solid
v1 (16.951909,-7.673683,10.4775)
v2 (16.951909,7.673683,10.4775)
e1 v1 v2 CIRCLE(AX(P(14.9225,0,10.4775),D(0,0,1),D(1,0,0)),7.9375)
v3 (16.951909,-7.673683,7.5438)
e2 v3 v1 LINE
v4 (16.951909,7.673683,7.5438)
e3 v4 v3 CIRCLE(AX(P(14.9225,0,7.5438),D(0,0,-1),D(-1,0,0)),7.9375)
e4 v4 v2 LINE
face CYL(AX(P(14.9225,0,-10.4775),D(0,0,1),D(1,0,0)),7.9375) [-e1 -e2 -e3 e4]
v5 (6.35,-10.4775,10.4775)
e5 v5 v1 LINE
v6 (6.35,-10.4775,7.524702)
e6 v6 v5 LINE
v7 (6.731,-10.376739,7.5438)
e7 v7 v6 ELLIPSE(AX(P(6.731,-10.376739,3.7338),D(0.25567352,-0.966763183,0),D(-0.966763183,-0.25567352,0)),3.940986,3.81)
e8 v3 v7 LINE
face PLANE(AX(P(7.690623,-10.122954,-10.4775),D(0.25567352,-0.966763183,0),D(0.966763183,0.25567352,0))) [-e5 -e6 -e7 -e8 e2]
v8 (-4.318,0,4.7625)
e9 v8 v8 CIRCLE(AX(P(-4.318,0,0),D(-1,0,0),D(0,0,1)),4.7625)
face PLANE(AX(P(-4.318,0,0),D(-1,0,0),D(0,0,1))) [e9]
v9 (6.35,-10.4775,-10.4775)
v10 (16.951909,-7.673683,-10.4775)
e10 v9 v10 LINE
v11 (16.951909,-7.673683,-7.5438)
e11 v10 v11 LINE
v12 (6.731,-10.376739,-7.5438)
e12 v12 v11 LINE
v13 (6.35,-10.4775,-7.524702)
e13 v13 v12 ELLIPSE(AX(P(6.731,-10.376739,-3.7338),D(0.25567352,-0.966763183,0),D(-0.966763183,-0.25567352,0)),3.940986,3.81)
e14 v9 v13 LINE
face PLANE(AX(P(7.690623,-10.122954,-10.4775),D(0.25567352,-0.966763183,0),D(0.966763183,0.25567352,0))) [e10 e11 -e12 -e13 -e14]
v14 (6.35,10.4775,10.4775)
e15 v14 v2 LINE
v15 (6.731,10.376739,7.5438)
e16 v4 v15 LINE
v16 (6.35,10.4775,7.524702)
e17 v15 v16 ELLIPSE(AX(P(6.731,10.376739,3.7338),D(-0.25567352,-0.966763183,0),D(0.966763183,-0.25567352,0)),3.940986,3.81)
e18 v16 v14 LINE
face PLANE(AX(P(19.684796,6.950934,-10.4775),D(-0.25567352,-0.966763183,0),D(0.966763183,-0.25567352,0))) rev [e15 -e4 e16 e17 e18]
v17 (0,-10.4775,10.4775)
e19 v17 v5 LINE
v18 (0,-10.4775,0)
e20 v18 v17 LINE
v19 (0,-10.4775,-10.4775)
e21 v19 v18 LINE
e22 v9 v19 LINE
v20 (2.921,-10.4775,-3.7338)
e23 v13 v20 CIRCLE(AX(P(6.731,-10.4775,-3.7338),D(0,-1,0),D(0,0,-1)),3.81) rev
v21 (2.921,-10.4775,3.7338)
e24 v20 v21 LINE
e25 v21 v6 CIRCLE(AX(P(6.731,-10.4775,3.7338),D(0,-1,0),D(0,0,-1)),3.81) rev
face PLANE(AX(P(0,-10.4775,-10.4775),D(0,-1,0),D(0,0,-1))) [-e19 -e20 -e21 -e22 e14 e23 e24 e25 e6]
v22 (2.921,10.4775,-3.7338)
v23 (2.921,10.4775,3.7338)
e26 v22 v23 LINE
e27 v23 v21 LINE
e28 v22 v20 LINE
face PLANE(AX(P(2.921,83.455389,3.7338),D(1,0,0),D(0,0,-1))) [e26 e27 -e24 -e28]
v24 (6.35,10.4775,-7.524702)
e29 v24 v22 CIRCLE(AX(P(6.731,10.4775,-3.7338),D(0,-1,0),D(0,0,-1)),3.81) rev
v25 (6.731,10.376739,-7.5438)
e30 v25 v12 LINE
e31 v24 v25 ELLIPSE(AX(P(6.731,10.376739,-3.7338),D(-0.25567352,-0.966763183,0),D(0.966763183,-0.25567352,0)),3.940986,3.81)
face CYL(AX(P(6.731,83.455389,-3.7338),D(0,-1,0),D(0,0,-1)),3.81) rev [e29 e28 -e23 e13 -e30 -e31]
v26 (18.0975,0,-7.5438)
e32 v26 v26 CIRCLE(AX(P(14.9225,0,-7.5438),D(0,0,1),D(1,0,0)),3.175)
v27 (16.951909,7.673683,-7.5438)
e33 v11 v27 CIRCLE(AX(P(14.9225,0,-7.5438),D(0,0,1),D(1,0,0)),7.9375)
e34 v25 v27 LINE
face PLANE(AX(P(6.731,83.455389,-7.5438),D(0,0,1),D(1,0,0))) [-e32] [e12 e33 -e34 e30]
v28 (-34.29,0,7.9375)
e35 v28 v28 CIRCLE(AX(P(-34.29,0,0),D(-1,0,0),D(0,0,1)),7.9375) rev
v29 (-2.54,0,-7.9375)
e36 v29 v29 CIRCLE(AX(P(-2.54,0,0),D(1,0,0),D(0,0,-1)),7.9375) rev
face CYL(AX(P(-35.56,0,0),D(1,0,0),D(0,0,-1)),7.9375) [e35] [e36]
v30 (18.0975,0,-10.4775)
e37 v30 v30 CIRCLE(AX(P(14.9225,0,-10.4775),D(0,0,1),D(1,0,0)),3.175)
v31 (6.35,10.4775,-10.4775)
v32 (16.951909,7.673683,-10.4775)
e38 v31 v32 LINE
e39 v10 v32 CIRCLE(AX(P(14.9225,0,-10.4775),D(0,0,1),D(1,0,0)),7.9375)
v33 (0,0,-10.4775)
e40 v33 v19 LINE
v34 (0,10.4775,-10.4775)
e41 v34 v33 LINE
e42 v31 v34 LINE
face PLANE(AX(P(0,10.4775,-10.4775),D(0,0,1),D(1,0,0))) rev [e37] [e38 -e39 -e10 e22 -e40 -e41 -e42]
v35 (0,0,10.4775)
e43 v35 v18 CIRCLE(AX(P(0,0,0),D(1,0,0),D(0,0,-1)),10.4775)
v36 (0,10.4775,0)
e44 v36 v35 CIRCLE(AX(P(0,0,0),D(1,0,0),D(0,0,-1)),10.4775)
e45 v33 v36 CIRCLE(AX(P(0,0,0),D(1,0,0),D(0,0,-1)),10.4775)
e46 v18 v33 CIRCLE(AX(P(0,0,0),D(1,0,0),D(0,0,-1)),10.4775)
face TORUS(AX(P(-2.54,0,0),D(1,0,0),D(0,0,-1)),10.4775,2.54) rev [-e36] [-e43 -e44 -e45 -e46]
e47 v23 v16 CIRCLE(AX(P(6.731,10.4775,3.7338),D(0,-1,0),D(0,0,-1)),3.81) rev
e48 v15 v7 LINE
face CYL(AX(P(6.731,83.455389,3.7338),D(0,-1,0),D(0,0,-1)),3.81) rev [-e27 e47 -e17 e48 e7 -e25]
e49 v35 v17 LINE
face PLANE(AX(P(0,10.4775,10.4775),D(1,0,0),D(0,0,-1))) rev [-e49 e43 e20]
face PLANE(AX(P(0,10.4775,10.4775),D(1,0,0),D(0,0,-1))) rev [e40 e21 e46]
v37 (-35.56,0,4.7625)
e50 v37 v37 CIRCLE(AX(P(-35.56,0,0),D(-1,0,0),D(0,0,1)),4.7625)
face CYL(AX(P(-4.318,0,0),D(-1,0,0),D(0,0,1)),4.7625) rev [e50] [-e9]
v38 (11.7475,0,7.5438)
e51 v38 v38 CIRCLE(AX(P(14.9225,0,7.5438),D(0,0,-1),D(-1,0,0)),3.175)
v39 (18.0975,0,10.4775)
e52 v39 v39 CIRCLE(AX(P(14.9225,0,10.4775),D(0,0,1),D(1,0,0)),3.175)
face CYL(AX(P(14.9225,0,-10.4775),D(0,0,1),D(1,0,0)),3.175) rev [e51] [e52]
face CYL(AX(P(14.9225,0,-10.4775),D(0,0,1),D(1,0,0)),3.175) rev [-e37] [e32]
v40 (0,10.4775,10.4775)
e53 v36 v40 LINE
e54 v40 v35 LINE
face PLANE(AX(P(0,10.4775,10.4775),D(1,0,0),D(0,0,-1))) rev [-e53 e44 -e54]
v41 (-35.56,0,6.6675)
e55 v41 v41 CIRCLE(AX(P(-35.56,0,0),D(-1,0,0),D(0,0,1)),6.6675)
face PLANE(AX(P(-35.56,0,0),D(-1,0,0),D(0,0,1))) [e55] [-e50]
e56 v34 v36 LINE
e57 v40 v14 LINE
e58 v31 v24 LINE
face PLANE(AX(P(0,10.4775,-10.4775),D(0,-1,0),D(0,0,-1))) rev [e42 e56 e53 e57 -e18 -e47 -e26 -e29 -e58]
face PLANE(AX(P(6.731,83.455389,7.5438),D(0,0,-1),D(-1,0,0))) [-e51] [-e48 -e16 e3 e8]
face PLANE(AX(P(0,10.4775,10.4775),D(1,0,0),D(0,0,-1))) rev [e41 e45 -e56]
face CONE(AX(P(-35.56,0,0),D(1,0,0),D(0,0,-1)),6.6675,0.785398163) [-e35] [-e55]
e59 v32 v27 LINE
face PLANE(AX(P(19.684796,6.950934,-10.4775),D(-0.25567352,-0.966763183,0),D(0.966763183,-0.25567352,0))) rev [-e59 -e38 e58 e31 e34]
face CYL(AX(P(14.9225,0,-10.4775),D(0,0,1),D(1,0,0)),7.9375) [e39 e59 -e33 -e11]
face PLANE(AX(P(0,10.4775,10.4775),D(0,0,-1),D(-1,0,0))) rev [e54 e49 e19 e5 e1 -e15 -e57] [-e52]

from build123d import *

# Parameters (mm, degrees)
SKETCH1_W               = 22.86
SKETCH1_H               = 20.955
BOSS_EXTRUDE1_DEPTH     = 10.4775
CUT_EXTRUDE1_DEPTH      = 33.733310729
CUT_EXTRUDE1_DEPTH_BACK = 33.733310729
CUT_EXTRUDE2_DEPTH      = 33.733310729
SKETCH4_R               = 7.9375
BOSS_EXTRUDE2_DEPTH     = 35.56
SKETCH5_R               = 4.7625
CUT_EXTRUDE3_DEPTH      = 31.242
FILLET1_R               = 2.54
CHAMFER1_SIZE           = 1.27


with BuildPart() as part:
    # Sketch1 → Boss-Extrude1 (new, symmetric)
    with BuildSketch(Plane(origin=(0, 0, 0), x_dir=(1, 0, 0), z_dir=(0, 1, 0))):
        with Locations((11.43, 0)):
            Rectangle(SKETCH1_W, SKETCH1_H)
    extrude(amount=BOSS_EXTRUDE1_DEPTH, both=True)

    # Sketch2 → Cut-Extrude1 (cut, two sides: drawn at the far end of the back side and taken through both)
    with BuildSketch(Plane(origin=(0, 10.4775, 0), x_dir=(1, 0, 0), z_dir=(0, 1, 0)).offset(-CUT_EXTRUDE1_DEPTH_BACK)):
        with BuildLine():
            Line((2.921, 3.7338), (2.921, -3.7338))
            ThreePointArc((2.921, -3.7338), (4.036923164, -6.427876836), (6.731, -7.5438))
            Line((6.731, -7.5438), (22.86, -7.5438))
            Line((22.86, -7.5438), (22.86, 7.5438))
            Line((22.86, 7.5438), (6.731, 7.5438))
            ThreePointArc((6.731, 7.5438), (4.036923164, 6.427876836), (2.921, 3.7338))
        make_face()
    extrude(amount=CUT_EXTRUDE1_DEPTH + CUT_EXTRUDE1_DEPTH_BACK, mode=Mode.SUBTRACT)

    # Sketch3 → Cut-Extrude2 (cut, through all)
    with BuildSketch(Plane.XY.offset(10.4775)):
        with BuildLine():
            ThreePointArc((16.951908562, 7.673682763), (21.211869472, 4.842286433), (22.86, 0))
            Line((22.86, 0), (22.86, 10.4775))
            Line((22.86, 10.4775), (6.35, 10.4775))
            Line((6.35, 10.4775), (16.951908562, 7.673682763))
        make_face()
        with BuildLine():
            Line((22.86, -10.4775), (22.86, 0))
            ThreePointArc((22.86, 0), (21.211869472, -4.842286433), (16.951908562, -7.673682763))
            Line((16.951908562, -7.673682763), (6.35, -10.4775))
            Line((6.35, -10.4775), (22.86, -10.4775))
        make_face()
        with BuildLine():
            ThreePointArc((18.0975, 0), (14.9225, 3.175), (11.7475, 0))
            Line((11.7475, 0), (18.0975, 0))
        make_face()
        with BuildLine():
            Line((18.0975, 0), (11.7475, 0))
            ThreePointArc((11.7475, 0), (14.9225, -3.175), (18.0975, 0))
        make_face()
    extrude(amount=-CUT_EXTRUDE2_DEPTH, mode=Mode.SUBTRACT)

    # Sketch4 → Boss-Extrude2 (add)
    with BuildSketch(Plane.ZY):
        with Locations(Location((0, 0, 0), (0, 0, 180))):
            Circle(SKETCH4_R)
    extrude(amount=BOSS_EXTRUDE2_DEPTH)

    # Sketch5 → Cut-Extrude3 (cut)
    with BuildSketch(Plane.ZY.offset(35.56)):
        Circle(SKETCH5_R)
    extrude(amount=-CUT_EXTRUDE3_DEPTH, mode=Mode.SUBTRACT)

    # Fillet1
    fillet1_edges = [part.edges().sort_by_distance(p)[0] for p in [
        (0, 0, 7.9375),
    ]]
    fillet(fillet1_edges, radius=FILLET1_R - 0.0001)  # a hair under: the kernel refuses the full size

    # Chamfer1
    chamfer1_edges = [part.edges().sort_by_distance(p)[0] for p in [
        (-35.56, 0, 7.9375),
    ]]
    chamfer(chamfer1_edges, length=CHAMFER1_SIZE)


solid = part.part
